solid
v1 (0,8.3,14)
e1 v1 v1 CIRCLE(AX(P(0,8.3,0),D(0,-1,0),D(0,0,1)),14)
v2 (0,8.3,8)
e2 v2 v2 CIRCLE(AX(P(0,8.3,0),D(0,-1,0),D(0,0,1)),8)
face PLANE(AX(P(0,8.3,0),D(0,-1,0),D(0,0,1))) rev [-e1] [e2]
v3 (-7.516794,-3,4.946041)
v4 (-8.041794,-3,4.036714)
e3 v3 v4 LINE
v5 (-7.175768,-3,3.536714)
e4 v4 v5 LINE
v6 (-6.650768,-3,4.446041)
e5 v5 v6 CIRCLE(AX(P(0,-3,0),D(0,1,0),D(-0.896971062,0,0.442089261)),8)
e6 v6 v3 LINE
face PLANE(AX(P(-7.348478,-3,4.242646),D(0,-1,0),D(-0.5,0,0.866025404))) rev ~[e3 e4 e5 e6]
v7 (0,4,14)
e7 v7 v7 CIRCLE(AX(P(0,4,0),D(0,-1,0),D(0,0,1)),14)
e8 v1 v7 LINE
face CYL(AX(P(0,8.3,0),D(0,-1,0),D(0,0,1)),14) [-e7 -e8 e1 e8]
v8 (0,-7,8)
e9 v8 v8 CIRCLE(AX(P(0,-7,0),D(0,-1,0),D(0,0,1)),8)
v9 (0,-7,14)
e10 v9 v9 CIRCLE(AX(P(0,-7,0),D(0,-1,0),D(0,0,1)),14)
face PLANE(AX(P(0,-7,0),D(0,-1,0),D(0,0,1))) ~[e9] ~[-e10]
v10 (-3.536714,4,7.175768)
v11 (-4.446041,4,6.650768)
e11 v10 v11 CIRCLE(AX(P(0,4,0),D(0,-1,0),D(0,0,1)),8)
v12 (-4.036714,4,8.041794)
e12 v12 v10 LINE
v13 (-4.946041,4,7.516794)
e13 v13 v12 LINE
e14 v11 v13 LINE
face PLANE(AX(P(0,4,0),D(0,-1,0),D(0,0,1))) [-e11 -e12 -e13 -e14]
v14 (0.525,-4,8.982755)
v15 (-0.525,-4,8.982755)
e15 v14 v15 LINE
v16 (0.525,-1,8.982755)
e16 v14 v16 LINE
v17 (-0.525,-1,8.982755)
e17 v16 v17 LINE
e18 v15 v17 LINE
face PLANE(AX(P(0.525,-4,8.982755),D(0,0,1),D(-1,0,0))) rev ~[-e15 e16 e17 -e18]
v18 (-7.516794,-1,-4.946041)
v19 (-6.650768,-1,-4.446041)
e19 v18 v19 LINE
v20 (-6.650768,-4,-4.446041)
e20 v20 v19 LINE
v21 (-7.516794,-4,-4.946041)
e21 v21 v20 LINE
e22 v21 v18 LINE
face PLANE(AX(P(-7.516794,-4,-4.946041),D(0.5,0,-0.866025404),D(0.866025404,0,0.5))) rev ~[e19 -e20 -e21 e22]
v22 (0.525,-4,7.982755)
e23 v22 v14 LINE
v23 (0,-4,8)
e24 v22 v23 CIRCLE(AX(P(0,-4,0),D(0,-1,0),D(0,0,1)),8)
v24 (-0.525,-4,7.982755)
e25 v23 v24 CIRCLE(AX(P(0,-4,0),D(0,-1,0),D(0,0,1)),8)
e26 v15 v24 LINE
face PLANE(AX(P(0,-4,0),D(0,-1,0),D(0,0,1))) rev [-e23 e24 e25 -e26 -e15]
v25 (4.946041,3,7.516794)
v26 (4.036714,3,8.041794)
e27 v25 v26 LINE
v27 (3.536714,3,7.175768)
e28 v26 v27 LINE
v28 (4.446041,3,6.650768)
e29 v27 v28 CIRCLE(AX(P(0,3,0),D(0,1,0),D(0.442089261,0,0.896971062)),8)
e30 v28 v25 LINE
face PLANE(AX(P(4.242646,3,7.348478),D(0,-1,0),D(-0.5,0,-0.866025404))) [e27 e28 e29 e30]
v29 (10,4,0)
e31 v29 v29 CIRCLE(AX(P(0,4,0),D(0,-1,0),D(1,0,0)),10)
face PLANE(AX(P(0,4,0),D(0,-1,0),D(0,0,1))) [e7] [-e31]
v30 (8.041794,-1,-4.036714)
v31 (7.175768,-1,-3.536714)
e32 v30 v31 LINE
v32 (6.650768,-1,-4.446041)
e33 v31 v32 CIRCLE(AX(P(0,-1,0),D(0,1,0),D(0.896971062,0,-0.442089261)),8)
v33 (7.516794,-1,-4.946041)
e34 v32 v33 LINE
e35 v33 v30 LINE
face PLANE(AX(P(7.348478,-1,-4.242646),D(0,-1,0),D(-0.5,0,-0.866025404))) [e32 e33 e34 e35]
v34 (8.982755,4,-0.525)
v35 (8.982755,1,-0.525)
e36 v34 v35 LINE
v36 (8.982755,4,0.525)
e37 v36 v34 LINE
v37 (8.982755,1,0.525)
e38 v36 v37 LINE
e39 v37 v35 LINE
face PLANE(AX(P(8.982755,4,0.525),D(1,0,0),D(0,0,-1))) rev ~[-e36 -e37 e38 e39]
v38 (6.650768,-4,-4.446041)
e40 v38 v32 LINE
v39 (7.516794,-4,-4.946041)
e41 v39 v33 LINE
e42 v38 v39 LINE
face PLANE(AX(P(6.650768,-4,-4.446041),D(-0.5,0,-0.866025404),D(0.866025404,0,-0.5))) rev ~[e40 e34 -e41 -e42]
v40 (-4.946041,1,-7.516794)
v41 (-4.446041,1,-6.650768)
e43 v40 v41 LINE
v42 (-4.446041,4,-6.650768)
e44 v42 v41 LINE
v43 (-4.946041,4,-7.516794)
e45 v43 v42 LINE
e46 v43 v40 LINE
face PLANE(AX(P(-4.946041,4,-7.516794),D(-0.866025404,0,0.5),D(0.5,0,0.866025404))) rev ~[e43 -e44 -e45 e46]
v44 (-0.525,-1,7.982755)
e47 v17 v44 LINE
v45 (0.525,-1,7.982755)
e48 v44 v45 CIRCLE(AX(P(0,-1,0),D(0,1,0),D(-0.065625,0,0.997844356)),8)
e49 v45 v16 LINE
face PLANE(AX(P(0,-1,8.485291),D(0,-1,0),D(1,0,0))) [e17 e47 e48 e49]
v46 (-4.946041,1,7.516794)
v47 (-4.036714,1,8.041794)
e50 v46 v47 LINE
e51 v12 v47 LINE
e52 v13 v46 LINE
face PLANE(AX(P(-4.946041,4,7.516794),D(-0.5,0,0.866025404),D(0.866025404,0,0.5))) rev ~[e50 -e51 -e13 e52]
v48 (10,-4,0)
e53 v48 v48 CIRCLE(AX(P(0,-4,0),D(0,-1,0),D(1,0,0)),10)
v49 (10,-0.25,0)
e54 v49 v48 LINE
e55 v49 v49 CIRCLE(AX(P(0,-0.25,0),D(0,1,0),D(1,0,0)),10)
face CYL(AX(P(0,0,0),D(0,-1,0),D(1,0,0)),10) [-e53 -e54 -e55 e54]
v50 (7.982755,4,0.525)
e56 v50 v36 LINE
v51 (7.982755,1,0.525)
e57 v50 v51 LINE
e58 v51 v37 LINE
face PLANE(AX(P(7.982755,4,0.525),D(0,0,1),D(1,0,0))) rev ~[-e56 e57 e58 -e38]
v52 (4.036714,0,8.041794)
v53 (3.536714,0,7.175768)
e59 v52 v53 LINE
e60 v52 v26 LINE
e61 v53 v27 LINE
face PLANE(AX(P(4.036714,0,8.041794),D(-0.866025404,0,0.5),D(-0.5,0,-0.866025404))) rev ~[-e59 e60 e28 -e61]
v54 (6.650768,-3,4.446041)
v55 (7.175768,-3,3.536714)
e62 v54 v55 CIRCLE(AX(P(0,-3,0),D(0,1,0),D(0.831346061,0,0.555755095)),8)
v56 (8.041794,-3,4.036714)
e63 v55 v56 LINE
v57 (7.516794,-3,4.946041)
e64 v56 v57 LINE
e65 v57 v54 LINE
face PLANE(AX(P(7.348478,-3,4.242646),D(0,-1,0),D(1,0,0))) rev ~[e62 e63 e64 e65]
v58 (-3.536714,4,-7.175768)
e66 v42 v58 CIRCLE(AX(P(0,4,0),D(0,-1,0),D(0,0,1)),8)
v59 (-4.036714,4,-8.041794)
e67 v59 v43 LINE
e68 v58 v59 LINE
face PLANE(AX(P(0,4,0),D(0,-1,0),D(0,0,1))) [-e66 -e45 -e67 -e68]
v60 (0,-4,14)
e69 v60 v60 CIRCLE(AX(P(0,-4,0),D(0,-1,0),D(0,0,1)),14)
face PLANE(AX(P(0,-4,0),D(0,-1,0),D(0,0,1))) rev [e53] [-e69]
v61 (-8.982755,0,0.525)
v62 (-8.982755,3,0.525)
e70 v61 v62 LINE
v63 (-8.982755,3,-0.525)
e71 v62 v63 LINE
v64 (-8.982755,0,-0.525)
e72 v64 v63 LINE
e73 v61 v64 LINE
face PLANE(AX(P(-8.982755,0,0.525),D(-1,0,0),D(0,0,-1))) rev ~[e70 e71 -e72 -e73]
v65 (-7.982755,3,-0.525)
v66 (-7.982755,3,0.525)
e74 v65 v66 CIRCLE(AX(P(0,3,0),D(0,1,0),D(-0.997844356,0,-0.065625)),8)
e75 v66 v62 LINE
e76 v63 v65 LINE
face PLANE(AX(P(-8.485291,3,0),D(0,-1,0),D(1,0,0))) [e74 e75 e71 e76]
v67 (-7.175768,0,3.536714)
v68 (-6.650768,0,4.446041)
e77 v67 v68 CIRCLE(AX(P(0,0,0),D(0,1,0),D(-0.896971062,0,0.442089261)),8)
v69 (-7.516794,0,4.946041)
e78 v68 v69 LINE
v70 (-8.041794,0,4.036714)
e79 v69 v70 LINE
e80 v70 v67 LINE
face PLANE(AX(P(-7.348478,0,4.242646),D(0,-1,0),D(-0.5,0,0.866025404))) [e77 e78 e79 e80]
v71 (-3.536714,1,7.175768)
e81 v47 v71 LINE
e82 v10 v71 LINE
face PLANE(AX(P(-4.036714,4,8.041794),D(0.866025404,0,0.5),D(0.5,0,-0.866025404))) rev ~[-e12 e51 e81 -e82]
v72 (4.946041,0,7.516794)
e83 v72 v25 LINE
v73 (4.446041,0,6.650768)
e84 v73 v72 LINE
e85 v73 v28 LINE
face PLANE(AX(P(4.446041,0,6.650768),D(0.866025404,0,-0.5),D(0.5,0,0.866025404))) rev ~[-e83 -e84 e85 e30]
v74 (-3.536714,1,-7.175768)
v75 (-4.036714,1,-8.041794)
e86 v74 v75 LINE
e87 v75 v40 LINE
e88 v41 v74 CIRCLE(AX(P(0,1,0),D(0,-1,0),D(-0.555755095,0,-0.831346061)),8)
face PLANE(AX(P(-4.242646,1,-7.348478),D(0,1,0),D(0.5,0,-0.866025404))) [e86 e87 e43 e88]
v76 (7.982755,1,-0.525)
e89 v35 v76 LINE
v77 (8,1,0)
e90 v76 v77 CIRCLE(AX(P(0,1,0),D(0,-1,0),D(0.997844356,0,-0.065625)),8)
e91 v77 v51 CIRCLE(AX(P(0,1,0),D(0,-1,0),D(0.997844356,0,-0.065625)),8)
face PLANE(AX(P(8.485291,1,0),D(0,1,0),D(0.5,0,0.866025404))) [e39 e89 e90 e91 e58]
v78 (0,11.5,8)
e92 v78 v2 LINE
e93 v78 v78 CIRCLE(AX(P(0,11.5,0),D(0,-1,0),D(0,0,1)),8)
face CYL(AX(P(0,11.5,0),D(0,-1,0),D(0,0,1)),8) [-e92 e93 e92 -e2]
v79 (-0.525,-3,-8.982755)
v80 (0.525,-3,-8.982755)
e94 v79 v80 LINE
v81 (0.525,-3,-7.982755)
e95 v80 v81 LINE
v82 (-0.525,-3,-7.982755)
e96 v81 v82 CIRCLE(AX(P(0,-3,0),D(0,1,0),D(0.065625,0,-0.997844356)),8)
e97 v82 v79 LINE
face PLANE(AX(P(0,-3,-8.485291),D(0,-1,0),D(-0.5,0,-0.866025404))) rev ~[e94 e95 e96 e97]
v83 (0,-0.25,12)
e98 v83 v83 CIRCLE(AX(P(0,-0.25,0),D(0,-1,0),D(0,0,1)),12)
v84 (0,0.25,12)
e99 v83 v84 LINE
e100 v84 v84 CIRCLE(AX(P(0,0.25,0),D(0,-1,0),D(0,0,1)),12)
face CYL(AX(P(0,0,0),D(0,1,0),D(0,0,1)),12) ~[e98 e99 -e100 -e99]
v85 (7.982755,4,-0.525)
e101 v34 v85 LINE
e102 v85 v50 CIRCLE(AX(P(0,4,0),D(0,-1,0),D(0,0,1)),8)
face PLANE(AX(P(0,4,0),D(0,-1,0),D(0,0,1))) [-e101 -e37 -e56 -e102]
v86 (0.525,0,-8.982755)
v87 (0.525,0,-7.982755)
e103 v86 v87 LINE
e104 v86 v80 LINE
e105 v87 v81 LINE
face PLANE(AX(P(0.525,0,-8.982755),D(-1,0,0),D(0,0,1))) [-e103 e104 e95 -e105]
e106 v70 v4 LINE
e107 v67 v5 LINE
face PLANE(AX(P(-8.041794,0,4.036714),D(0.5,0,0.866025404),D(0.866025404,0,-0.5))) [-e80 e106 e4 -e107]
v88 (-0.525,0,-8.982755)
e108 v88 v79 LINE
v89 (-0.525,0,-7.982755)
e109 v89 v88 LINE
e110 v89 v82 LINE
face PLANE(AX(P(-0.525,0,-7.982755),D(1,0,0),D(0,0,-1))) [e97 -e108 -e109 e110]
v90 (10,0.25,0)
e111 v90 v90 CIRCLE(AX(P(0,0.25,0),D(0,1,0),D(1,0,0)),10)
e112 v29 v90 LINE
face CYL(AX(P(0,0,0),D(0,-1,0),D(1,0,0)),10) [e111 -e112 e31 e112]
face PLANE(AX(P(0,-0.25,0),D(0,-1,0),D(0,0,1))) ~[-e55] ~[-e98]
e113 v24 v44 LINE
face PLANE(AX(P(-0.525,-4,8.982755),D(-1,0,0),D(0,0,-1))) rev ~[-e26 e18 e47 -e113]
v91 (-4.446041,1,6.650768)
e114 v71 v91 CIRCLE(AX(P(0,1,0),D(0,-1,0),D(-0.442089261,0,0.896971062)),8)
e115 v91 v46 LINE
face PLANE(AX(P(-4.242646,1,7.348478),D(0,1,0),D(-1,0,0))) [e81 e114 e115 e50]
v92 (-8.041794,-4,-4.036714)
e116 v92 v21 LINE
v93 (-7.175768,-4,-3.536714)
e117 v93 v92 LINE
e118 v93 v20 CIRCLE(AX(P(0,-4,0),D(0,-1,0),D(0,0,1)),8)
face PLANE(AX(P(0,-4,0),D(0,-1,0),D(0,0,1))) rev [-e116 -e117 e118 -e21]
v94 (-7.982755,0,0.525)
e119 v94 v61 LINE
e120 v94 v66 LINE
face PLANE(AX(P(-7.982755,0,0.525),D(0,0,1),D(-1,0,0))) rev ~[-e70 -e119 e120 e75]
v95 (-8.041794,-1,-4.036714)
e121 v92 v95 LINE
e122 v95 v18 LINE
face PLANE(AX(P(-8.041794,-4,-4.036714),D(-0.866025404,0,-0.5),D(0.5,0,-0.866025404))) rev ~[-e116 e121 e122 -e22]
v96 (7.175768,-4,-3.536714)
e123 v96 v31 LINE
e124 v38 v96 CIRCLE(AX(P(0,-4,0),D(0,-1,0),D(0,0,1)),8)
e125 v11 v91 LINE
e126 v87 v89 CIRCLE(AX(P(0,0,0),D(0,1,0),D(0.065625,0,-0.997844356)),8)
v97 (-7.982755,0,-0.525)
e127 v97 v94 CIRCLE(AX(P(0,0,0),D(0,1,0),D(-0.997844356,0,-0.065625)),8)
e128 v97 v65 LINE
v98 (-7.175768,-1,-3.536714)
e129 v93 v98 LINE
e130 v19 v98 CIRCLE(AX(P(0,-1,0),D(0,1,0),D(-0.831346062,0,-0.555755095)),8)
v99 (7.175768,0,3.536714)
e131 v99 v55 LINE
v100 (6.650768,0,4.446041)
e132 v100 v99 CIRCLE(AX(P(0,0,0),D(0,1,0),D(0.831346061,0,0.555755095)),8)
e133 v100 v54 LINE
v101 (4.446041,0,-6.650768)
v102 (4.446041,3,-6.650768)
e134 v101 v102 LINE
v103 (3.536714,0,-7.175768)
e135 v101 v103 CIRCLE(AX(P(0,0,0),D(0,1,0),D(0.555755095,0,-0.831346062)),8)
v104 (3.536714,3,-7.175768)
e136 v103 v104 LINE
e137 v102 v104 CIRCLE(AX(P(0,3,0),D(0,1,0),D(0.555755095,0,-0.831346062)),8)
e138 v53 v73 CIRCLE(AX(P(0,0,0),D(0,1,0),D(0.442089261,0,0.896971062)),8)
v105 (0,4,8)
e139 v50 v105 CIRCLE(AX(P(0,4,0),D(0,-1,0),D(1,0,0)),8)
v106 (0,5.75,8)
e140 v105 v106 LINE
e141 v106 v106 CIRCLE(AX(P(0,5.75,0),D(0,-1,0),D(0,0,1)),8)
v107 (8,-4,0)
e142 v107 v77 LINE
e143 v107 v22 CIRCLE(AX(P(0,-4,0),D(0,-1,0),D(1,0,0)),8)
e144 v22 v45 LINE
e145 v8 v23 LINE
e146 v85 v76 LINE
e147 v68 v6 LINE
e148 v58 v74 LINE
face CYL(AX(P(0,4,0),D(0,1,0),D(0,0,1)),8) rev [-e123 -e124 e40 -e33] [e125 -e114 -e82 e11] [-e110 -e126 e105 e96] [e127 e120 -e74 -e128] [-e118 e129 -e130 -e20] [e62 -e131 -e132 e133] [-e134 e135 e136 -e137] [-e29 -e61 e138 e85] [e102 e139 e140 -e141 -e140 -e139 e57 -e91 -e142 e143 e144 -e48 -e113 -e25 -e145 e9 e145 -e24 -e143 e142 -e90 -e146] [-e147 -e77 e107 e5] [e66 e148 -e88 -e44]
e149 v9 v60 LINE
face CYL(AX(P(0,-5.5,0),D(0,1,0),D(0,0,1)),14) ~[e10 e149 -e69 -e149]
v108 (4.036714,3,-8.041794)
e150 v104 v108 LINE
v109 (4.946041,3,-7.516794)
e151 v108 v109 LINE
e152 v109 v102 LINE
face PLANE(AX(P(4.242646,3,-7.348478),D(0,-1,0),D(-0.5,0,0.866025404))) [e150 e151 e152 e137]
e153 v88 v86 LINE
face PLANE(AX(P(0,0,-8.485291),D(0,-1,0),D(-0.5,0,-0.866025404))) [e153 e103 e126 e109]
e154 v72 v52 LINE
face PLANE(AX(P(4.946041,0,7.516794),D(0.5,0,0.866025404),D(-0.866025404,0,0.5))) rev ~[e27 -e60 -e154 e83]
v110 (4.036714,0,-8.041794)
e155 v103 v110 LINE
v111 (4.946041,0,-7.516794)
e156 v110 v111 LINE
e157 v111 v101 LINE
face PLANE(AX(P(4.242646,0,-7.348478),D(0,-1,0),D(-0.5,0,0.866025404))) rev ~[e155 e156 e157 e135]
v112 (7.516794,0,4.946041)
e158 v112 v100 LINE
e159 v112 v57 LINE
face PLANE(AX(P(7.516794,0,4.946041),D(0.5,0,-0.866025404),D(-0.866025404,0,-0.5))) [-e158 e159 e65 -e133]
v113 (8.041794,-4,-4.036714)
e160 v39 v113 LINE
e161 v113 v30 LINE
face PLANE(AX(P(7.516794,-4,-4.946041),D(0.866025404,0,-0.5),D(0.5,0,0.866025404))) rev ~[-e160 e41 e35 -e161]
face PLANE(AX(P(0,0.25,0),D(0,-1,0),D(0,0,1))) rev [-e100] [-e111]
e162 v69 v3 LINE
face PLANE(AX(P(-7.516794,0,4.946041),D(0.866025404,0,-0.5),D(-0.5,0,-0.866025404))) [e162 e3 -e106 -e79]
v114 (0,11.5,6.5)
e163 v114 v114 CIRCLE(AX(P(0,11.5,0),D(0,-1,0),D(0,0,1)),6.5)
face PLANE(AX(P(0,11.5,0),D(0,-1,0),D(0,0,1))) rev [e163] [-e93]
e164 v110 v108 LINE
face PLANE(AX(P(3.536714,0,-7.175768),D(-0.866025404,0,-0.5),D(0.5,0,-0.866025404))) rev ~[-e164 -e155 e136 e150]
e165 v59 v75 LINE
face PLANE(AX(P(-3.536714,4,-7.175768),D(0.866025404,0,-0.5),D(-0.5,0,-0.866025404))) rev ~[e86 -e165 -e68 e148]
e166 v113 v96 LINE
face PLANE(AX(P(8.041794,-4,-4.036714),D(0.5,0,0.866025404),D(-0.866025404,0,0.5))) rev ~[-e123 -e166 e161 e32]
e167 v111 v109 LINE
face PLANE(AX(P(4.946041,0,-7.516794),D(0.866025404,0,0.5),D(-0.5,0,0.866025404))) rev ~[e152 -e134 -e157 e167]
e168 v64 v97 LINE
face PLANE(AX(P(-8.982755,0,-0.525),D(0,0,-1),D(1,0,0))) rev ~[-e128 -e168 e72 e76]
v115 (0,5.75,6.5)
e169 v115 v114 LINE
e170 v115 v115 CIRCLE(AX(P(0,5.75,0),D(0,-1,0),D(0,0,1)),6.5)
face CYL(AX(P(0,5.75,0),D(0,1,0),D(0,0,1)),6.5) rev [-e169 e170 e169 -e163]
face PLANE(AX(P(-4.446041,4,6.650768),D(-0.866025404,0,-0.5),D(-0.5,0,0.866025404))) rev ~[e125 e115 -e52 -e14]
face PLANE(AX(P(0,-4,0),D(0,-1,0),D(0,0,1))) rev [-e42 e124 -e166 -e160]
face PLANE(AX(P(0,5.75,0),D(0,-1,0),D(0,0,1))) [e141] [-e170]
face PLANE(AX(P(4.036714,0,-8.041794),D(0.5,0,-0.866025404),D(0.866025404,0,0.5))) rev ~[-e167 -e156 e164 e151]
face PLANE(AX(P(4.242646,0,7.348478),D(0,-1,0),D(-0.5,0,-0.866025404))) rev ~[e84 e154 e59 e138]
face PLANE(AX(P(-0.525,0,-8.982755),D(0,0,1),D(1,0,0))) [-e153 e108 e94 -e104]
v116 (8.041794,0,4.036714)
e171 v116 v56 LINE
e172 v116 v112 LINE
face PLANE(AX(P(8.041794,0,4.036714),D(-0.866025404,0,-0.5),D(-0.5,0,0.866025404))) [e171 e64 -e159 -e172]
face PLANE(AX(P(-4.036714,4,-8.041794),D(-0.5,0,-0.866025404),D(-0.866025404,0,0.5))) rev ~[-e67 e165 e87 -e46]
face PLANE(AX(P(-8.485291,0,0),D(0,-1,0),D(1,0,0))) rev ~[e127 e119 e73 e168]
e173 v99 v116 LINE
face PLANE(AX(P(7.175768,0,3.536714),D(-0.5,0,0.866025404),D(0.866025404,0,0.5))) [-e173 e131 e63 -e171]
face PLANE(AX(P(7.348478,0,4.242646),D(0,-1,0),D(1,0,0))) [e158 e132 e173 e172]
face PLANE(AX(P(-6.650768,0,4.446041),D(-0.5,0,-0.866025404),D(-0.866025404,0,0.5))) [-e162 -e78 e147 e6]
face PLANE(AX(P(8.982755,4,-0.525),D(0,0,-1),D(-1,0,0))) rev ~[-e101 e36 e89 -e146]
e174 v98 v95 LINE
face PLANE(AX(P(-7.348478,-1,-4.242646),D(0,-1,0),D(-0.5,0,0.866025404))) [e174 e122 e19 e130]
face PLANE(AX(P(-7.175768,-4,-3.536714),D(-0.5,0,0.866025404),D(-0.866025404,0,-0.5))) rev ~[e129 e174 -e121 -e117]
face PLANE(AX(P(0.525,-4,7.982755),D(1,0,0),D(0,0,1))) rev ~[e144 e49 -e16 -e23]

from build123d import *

# Parameters (mm, degrees)
F0_R            = 10
F0_R_2          = 8
F1_DEPTH        = 4
F3_DEPTH        = 3
F3_COPIES_COUNT = 3
F5_DEPTH        = 3
F5_COPIES_COUNT = 3
F7_DEPTH        = 3
F7_COPIES_COUNT = 3
F9_DEPTH        = 3
F9_COPIES_COUNT = 3
F10_W           = 0.5
F10_H           = 2
F10_W_2         = 3
F10_H_2         = 6


# Not quite as in the source:
# - a pattern or mirror of a feature is missing from the dataset's text; its kind, count and spacing are read off the source's solid


with BuildPart() as f1:
    # F0 (on Front) → F1 (new body, symmetric)
    with BuildSketch(Plane.XZ):
        Circle(F0_R)
        Circle(F0_R_2, mode=Mode.SUBTRACT)
    extrude(amount=F1_DEPTH, both=True)

    # F2 (on face) → F3 (cut)
    with BuildSketch(Plane.XZ.offset(4)):
        with BuildLine():
            Line((-0.525, 8.9827548503), (-0.525, 7.9827548503))
            ThreePointArc((-0.525, 7.9827548503), (0, 8), (0.525, 7.9827548503))
            Line((0.525, 7.9827548503), (0.525, 8.9827548503))
            Line((0.525, 8.9827548503), (-0.525, 8.9827548503))
        make_face()
    f3 = extrude(amount=-F3_DEPTH, mode=Mode.SUBTRACT)

    # F3_copies: F3 ×3 about axis
    f3_copies_axis = Axis((0, 0, 0), (0, 1, 0))
    for i in range(1, F3_COPIES_COUNT):
        add(f3.rotate(f3_copies_axis, i * 360 / F3_COPIES_COUNT), mode=Mode.SUBTRACT)

    # F4 (on Front) → F5 (cut)
    with BuildSketch(Plane.XZ):
        with BuildLine():
            ThreePointArc((6.6507684925, 4.4460407621), (6.9282032303, 4), (7.1757684925, 3.5367140882))
            Line((7.1757684925, 3.5367140882), (8.0417938963, 4.0367140882))
            Line((8.0417938963, 4.0367140882), (7.5167938963, 4.9460407621))
            Line((7.5167938963, 4.9460407621), (6.6507684925, 4.4460407621))
        make_face()
    f5 = extrude(amount=F5_DEPTH, mode=Mode.SUBTRACT)

    # F5_copies: F5 ×3 about axis
    f5_copies_axis = Axis((0, 0, 0), (0, 1, 0))
    for i in range(1, F5_COPIES_COUNT):
        add(f5.rotate(f5_copies_axis, i * 360 / F5_COPIES_COUNT), mode=Mode.SUBTRACT)

    # F6 (on face) → F7 (cut)
    with BuildSketch(Plane(origin=(0, 4, 0), x_dir=(-1, 0, 0), z_dir=(0, 1, 0))):
        with BuildLine():
            ThreePointArc((3.5367140882, 7.1757684925), (4, 6.9282032303), (4.4460407621, 6.6507684925))
            Line((4.4460407621, 6.6507684925), (4.9460407621, 7.5167938963))
            Line((4.9460407621, 7.5167938963), (4.0367140882, 8.0417938963))
            Line((4.0367140882, 8.0417938963), (3.5367140882, 7.1757684925))
        make_face()
    f7 = extrude(amount=-F7_DEPTH, mode=Mode.SUBTRACT)

    # F7_copies: F7 ×3 about axis
    f7_copies_axis = Axis((0, 0, 0), (0, 1, 0))
    for i in range(1, F7_COPIES_COUNT):
        add(f7.rotate(f7_copies_axis, i * 360 / F7_COPIES_COUNT), mode=Mode.SUBTRACT)

    # F8 (on Front) → F9 (cut)
    with BuildSketch(Plane.XZ):
        with BuildLine():
            ThreePointArc((-7.9827548503, -0.525), (-8, 0), (-7.9827548503, 0.525))
            Line((-7.9827548503, 0.525), (-8.9827548503, 0.525))
            Line((-8.9827548503, 0.525), (-8.9827548503, -0.525))
            Line((-8.9827548503, -0.525), (-7.9827548503, -0.525))
        make_face()
    f9 = extrude(amount=-F9_DEPTH, mode=Mode.SUBTRACT)

    # F9_copies: F9 ×3 about axis
    f9_copies_axis = Axis((0, 0, 0), (0, 1, 0))
    for i in range(1, F9_COPIES_COUNT):
        add(f9.rotate(f9_copies_axis, i * 360 / F9_COPIES_COUNT), mode=Mode.SUBTRACT)

    # F10 (on Right) → F11 (revolve)
    with BuildSketch(Plane.YZ):
        Polygon((4, 14), (4, 8), (5.75, 8), (5.75, 6.5), (11.5, 6.5), (11.5, 8), (8.3, 8), (8.3, 14), align=None)
        with Locations((0, 11)):
            Rectangle(F10_W, F10_H)
        with Locations((-5.5, 11)):
            Rectangle(F10_W_2, F10_H_2)
    revolve(axis=Axis((0, 0, 0), (0, -1, 0)))


solid = f1.part
